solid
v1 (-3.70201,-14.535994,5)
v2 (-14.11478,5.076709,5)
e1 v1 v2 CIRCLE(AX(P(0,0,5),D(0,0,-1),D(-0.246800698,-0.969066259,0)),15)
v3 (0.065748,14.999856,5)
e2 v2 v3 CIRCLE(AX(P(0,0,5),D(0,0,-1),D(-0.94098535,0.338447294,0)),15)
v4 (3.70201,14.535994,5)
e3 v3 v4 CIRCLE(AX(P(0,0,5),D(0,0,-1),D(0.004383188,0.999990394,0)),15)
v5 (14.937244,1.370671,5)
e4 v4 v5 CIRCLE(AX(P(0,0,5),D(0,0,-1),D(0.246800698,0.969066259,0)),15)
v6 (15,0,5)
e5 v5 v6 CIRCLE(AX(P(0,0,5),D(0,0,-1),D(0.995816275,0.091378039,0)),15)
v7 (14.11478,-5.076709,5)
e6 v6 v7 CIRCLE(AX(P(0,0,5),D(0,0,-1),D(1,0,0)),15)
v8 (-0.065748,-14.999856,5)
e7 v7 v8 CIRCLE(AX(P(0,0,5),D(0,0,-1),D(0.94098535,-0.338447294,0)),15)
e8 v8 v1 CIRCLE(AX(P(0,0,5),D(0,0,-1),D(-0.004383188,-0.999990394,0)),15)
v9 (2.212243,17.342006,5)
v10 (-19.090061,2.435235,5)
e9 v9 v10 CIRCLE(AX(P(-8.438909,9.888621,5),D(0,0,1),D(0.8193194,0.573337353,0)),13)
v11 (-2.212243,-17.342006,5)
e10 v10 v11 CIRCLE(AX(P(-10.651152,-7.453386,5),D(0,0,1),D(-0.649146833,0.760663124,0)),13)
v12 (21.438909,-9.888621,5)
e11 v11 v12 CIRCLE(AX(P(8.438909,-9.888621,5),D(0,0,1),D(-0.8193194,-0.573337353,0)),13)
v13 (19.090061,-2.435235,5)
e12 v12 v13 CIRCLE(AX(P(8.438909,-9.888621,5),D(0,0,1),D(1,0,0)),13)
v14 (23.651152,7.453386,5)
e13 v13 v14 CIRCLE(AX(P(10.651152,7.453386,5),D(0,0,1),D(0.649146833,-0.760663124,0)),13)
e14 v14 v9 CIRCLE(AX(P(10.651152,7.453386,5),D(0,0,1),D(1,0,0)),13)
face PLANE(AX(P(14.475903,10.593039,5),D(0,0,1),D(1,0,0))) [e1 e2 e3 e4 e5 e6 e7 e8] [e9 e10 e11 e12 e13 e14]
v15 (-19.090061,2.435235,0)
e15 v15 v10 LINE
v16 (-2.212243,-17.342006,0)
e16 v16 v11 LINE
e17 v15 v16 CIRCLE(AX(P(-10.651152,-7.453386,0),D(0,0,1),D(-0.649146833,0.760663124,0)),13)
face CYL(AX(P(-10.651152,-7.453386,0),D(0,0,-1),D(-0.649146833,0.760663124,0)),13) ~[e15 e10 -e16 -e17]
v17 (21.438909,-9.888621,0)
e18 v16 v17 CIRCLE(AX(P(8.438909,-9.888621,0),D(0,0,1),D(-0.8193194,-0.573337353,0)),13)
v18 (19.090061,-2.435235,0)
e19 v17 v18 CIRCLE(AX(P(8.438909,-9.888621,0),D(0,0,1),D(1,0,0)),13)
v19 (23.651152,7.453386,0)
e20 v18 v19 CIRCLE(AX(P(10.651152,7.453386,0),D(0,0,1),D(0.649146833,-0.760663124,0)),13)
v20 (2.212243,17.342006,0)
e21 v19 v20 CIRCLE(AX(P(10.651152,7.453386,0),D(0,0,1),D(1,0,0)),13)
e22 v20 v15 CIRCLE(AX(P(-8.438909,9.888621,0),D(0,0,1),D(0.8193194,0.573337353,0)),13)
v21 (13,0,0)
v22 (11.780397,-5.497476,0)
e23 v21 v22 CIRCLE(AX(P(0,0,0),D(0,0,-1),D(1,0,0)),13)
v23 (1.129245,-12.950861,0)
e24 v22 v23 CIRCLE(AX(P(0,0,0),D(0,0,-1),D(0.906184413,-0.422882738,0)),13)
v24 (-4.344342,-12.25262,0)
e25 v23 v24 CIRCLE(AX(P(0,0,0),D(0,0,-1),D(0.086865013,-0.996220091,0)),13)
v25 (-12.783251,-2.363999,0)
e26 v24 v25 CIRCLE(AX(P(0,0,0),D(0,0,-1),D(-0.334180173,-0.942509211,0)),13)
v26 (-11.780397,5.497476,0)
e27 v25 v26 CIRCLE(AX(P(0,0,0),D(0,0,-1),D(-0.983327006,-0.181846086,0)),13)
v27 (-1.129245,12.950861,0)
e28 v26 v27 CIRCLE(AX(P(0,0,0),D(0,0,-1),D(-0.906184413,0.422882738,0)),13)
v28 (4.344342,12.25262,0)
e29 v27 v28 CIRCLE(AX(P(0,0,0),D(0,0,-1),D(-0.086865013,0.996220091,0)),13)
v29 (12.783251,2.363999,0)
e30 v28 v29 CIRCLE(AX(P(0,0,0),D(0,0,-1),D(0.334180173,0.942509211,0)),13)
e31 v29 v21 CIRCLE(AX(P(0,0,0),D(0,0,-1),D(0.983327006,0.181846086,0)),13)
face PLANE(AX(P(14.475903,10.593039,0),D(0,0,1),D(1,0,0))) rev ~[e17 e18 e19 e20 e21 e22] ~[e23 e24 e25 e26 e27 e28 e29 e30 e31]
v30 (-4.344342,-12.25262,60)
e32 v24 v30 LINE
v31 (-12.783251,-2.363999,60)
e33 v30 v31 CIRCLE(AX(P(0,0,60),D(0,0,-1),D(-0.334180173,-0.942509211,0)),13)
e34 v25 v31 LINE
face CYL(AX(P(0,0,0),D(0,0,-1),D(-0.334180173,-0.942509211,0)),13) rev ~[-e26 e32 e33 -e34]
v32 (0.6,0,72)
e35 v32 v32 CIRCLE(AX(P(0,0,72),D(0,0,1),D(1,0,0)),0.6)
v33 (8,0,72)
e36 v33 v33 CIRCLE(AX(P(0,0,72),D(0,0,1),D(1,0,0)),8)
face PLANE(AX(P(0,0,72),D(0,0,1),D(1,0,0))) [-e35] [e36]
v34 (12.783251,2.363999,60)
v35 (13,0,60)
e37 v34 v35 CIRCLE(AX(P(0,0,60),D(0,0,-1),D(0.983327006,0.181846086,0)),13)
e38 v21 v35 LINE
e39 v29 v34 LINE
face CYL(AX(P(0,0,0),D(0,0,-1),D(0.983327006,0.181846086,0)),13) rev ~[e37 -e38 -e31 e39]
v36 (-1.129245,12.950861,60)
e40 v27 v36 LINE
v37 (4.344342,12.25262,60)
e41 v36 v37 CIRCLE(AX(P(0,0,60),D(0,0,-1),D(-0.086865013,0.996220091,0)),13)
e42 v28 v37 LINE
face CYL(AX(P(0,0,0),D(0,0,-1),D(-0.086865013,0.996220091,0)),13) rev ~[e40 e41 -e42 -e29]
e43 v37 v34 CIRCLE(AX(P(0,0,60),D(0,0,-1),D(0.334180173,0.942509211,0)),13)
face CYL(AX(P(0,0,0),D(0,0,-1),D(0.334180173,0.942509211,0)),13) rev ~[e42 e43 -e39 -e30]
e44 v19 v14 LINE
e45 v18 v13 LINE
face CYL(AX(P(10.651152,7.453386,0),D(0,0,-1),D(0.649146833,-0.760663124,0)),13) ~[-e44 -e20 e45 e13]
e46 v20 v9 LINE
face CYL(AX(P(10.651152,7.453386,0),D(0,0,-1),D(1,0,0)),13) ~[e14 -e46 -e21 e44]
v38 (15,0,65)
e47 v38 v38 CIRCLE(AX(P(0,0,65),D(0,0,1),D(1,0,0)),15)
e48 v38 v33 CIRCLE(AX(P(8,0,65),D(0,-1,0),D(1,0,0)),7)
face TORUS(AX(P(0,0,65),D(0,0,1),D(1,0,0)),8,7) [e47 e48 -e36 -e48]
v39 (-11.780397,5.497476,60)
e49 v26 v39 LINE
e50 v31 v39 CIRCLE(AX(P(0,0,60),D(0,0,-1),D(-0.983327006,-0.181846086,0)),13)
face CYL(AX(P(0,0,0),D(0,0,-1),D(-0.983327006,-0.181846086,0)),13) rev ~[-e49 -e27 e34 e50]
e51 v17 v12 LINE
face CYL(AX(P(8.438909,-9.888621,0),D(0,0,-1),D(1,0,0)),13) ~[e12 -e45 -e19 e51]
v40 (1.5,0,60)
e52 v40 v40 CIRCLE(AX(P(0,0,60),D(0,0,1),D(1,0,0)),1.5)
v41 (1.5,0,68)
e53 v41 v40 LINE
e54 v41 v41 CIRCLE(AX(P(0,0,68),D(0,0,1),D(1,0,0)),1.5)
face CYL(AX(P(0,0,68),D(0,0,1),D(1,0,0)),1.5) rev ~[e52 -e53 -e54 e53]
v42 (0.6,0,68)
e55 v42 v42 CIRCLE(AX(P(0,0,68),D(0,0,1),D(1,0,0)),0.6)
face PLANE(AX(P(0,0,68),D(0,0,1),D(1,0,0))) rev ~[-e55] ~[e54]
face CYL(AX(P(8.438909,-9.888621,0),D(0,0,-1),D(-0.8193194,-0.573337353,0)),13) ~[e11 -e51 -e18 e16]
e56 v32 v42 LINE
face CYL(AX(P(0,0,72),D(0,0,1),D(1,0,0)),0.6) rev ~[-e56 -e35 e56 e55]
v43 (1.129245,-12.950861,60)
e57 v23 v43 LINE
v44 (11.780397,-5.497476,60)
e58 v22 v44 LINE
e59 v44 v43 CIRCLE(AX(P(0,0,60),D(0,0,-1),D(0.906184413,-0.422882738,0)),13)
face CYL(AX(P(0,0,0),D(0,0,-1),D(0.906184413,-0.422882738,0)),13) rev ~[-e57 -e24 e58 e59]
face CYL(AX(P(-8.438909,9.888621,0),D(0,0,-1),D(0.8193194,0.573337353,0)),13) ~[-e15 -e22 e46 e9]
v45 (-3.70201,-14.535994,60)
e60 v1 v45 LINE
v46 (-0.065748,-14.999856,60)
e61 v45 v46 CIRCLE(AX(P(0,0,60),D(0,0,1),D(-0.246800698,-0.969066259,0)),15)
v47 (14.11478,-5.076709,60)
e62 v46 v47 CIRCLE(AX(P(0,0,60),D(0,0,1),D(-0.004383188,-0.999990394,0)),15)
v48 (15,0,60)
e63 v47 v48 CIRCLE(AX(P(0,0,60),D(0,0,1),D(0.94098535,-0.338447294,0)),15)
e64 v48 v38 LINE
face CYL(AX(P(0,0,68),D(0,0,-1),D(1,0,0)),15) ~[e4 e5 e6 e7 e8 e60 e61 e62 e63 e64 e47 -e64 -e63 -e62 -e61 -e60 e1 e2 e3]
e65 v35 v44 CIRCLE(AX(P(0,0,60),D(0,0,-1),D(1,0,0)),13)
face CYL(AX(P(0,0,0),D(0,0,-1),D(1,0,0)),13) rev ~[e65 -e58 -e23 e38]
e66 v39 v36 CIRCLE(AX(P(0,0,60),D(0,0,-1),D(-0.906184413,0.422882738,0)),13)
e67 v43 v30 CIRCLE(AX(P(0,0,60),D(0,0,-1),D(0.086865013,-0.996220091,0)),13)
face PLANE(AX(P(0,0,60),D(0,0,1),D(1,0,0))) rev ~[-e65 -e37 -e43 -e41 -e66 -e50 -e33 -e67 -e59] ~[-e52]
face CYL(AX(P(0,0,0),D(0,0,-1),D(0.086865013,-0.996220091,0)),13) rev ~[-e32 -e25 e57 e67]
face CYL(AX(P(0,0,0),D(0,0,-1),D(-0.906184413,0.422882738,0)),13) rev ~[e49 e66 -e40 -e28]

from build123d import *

# Parameters (mm, degrees)
F1_DEPTH  = 60
F2_DEPTH  = 5
F3_R      = 15
F4_DEPTH  = 8
F5_R      = 1.5
F6_DEPTH  = 68.001
F7_R      = 15
F8_DEPTH  = 4
F9_R      = 0.6
F11_DEPTH = 72.001


# Not quite as in the source:
# - a fillet or chamfer that OpenCascade refuses, or shapes differently, is made with other operations: its cross-section is extruded or revolved along the edge and cut away or added


with BuildPart() as f1:
    # F0 (on Top) → F1 (new body)
    with BuildSketch(Plane.XY):
        with BuildLine():
            ThreePointArc((4.344342247, 12.2526197379), (9.8886206176, 8.4389088324), (12.7832510794, 2.3639991203))
            ThreePointArc((12.7832510794, 2.3639991203), (13.8829504808, 1.9165651298), (14.9372441283, 1.3706705849))
            ThreePointArc((14.9372441283, 1.3706705849), (11.4099468664, 9.7372024989), (3.7020104756, 14.5359938923))
            ThreePointArc((3.7020104756, 14.5359938923), (4.0753636897, 13.4089875362), (4.344342247, 12.2526197379))
        make_face()
        with BuildLine():
            ThreePointArc((12.7832510794, 2.3639991203), (12.9456993637, 1.1869574482), (13, 0))
            ThreePointArc((13, 0), (12.6914373848, -2.8155669247), (11.7803973681, -5.4974755888))
            ThreePointArc((11.7803973681, -5.4974755888), (12.9572055714, -5.3404456491), (14.1147802532, -5.0767094072))
            ThreePointArc((14.1147802532, -5.0767094072), (14.7770379948, -2.5766544396), (15, 0))
            ThreePointArc((15, 0), (14.9843028187, 0.6860532326), (14.9372441283, 1.3706705849))
            ThreePointArc((14.9372441283, 1.3706705849), (13.8829504808, 1.9165651298), (12.7832510794, 2.3639991203))
        make_face()
        with BuildLine():
            ThreePointArc((14.1147802532, -5.0767094072), (12.9572055714, -5.3404456491), (11.7803973681, -5.4974755888))
            ThreePointArc((11.7803973681, -5.4974755888), (7.453385593, -10.6511522007), (1.1292451674, -12.9508611819))
            ThreePointArc((1.1292451674, -12.9508611819), (0.5785791746, -14.0026705342), (-0.0657478246, -14.9998559068))
            ThreePointArc((-0.0657478246, -14.9998559068), (8.6000602997, -12.2897910008), (14.1147802532, -5.0767094072))
        make_face()
        with BuildLine():
            ThreePointArc((-0.0657478246, -14.9998559068), (0.5785791746, -14.0026705342), (1.1292451674, -12.9508611819))
            ThreePointArc((1.1292451674, -12.9508611819), (-1.6450220625, -12.8954993084), (-4.344342247, -12.2526197379))
            ThreePointArc((-4.344342247, -12.2526197379), (-4.0753636897, -13.4089875362), (-3.7020104756, -14.5359938923))
            ThreePointArc((-3.7020104756, -14.5359938923), (-1.8981023799, -14.879422279), (-0.0657478246, -14.9998559068))
        make_face()
        with BuildLine():
            ThreePointArc((-3.7020104756, -14.5359938923), (-4.0753636897, -13.4089875362), (-4.344342247, -12.2526197379))
            ThreePointArc((-4.344342247, -12.2526197379), (-9.8886206176, -8.4389088324), (-12.7832510794, -2.3639991203))
            ThreePointArc((-12.7832510794, -2.3639991203), (-13.8829504808, -1.9165651298), (-14.9372441283, -1.3706705849))
            ThreePointArc((-14.9372441283, -1.3706705849), (-11.4099468664, -9.7372024989), (-3.7020104756, -14.5359938923))
        make_face()
        with BuildLine():
            ThreePointArc((-12.7832510794, -2.3639991203), (-12.8954993084, 1.6450220625), (-11.7803973681, 5.4974755888))
            ThreePointArc((-11.7803973681, 5.4974755888), (-12.9572055714, 5.3404456491), (-14.1147802532, 5.0767094072))
            ThreePointArc((-14.1147802532, 5.0767094072), (-14.879422279, 1.8981023799), (-14.9372441283, -1.3706705849))
            ThreePointArc((-14.9372441283, -1.3706705849), (-13.8829504808, -1.9165651298), (-12.7832510794, -2.3639991203))
        make_face()
        with BuildLine():
            ThreePointArc((-11.7803973681, 5.4974755888), (-7.453385593, 10.6511522007), (-1.1292451674, 12.9508611819))
            ThreePointArc((-1.1292451674, 12.9508611819), (-0.5785791746, 14.0026705342), (0.0657478246, 14.9998559068))
            ThreePointArc((0.0657478246, 14.9998559068), (-8.6000602997, 12.2897910008), (-14.1147802532, 5.0767094072))
            ThreePointArc((-14.1147802532, 5.0767094072), (-12.9572055714, 5.3404456491), (-11.7803973681, 5.4974755888))
        make_face()
        with BuildLine():
            ThreePointArc((-1.1292451674, 12.9508611819), (1.6450220625, 12.8954993084), (4.344342247, 12.2526197379))
            ThreePointArc((4.344342247, 12.2526197379), (4.0753636897, 13.4089875362), (3.7020104756, 14.5359938923))
            ThreePointArc((3.7020104756, 14.5359938923), (1.8981023799, 14.879422279), (0.0657478246, 14.9998559068))
            ThreePointArc((0.0657478246, 14.9998559068), (-0.5785791746, 14.0026705342), (-1.1292451674, 12.9508611819))
        make_face()
    extrude(amount=F1_DEPTH)

    # F0 (on Top) → F2 (join)
    with BuildSketch(Plane.XY):
        with BuildLine():
            ThreePointArc((3.7020104756, 14.5359938923), (11.4099468664, 9.7372024989), (14.9372441283, 1.3706705849))
            ThreePointArc((14.9372441283, 1.3706705849), (17.2222714986, -0.3046475231), (19.0900610331, -2.4352350245))
            ThreePointArc((19.0900610331, -2.4352350245), (22.4559354435, 2.0084712145), (23.6511522007, 7.453385593))
            ThreePointArc((23.6511522007, 7.453385593), (16.0960665792, 19.2581688359), (2.2122433682, 17.3420062106))
            ThreePointArc((2.2122433682, 17.3420062106), (3.0431666419, 15.9846802304), (3.7020104756, 14.5359938923))
        make_face()
        with BuildLine():
            ThreePointArc((19.0900610331, -2.4352350245), (17.2222714986, -0.3046475231), (14.9372441283, 1.3706705849))
            ThreePointArc((14.9372441283, 1.3706705849), (14.9843028187, 0.6860532326), (15, 0))
            ThreePointArc((15, 0), (14.7770379948, -2.5766544396), (14.1147802532, -5.0767094072))
            ThreePointArc((14.1147802532, -5.0767094072), (16.7472118135, -4.0286898812), (19.0900610331, -2.4352350245))
        make_face()
        with BuildLine():
            ThreePointArc((19.0900610331, -2.4352350245), (16.7472118135, -4.0286898812), (14.1147802532, -5.0767094072))
            ThreePointArc((14.1147802532, -5.0767094072), (8.6000602997, -12.2897910008), (-0.0657478246, -14.9998559068))
            ThreePointArc((-0.0657478246, -14.9998559068), (-1.0671791062, -16.2367482592), (-2.2122433682, -17.3420062106))
            ThreePointArc((-2.2122433682, -17.3420062106), (12.346275042, -22.2875112657), (21.4389088324, -9.8886206176))
            ThreePointArc((21.4389088324, -9.8886206176), (20.8377994805, -5.981254408), (19.0900610331, -2.4352350245))
        make_face()
        with BuildLine():
            ThreePointArc((0.0657478246, 14.9998559068), (1.8981023799, 14.879422279), (3.7020104756, 14.5359938923))
            ThreePointArc((3.7020104756, 14.5359938923), (3.0431666419, 15.9846802304), (2.2122433682, 17.3420062106))
            ThreePointArc((2.2122433682, 17.3420062106), (1.0671791062, 16.2367482592), (0.0657478246, 14.9998559068))
        make_face()
        with BuildLine():
            ThreePointArc((-2.2122433682, -17.3420062106), (-1.0671791062, -16.2367482592), (-0.0657478246, -14.9998559068))
            ThreePointArc((-0.0657478246, -14.9998559068), (-1.8981023799, -14.879422279), (-3.7020104756, -14.5359938923))
            ThreePointArc((-3.7020104756, -14.5359938923), (-3.0431666419, -15.9846802304), (-2.2122433682, -17.3420062106))
        make_face()
        with BuildLine():
            ThreePointArc((-14.1147802532, 5.0767094072), (-8.6000602997, 12.2897910008), (0.0657478246, 14.9998559068))
            ThreePointArc((0.0657478246, 14.9998559068), (1.0671791062, 16.2367482592), (2.2122433682, 17.3420062106))
            ThreePointArc((2.2122433682, 17.3420062106), (-15.8922944255, 20.5397728182), (-19.0900610331, 2.4352350245))
            ThreePointArc((-19.0900610331, 2.4352350245), (-16.7472118135, 4.0286898812), (-14.1147802532, 5.0767094072))
        make_face()
        with BuildLine():
            ThreePointArc((-2.2122433682, -17.3420062106), (-3.0431666419, -15.9846802304), (-3.7020104756, -14.5359938923))
            ThreePointArc((-3.7020104756, -14.5359938923), (-11.4099468664, -9.7372024989), (-14.9372441283, -1.3706705849))
            ThreePointArc((-14.9372441283, -1.3706705849), (-17.2222714986, 0.3046475231), (-19.0900610331, 2.4352350245))
            ThreePointArc((-19.0900610331, 2.4352350245), (-20.5397728182, -15.8922944255), (-2.2122433682, -17.3420062106))
        make_face()
        with BuildLine():
            ThreePointArc((-14.9372441283, -1.3706705849), (-14.879422279, 1.8981023799), (-14.1147802532, 5.0767094072))
            ThreePointArc((-14.1147802532, 5.0767094072), (-16.7472118135, 4.0286898812), (-19.0900610331, 2.4352350245))
            ThreePointArc((-19.0900610331, 2.4352350245), (-17.2222714986, 0.3046475231), (-14.9372441283, -1.3706705849))
        make_face()
    extrude(amount=F2_DEPTH)

    # F3 (on face) → F4 (join)
    with BuildSketch(Plane.XY.offset(60)):
        Circle(F3_R)
    extrude(amount=F4_DEPTH)

    # F5 (on face) → F6 (cut, through all)
    with BuildSketch(Plane.XY.offset(68)):
        Circle(F5_R)
    extrude(amount=-F6_DEPTH, mode=Mode.SUBTRACT)

    # F7 (on face) → F8 (join)
    with BuildSketch(Plane.XY.offset(68)):
        Circle(F7_R)
    extrude(amount=F8_DEPTH)

    # F10: fillet of radius 7 on 1 edges, made by hand

    # F10_s1 → F10_t2 (revolve, cut)
    with BuildSketch(Plane.XZ):
        with BuildLine():
            ThreePointArc((15, 65), (12.9497474683, 69.9497474683), (8, 72))
            Line((8, 72), (15, 72))
            Line((15, 72), (15, 65))
        make_face()
    revolve(axis=Axis((0, 0, 72), (0, 0, 1)), mode=Mode.SUBTRACT)

    # F9 (on face) → F11 (cut, through all)
    with BuildSketch(Plane.XY.offset(72)):
        Circle(F9_R)
    extrude(amount=-F11_DEPTH, mode=Mode.SUBTRACT)


solid = f1.part
